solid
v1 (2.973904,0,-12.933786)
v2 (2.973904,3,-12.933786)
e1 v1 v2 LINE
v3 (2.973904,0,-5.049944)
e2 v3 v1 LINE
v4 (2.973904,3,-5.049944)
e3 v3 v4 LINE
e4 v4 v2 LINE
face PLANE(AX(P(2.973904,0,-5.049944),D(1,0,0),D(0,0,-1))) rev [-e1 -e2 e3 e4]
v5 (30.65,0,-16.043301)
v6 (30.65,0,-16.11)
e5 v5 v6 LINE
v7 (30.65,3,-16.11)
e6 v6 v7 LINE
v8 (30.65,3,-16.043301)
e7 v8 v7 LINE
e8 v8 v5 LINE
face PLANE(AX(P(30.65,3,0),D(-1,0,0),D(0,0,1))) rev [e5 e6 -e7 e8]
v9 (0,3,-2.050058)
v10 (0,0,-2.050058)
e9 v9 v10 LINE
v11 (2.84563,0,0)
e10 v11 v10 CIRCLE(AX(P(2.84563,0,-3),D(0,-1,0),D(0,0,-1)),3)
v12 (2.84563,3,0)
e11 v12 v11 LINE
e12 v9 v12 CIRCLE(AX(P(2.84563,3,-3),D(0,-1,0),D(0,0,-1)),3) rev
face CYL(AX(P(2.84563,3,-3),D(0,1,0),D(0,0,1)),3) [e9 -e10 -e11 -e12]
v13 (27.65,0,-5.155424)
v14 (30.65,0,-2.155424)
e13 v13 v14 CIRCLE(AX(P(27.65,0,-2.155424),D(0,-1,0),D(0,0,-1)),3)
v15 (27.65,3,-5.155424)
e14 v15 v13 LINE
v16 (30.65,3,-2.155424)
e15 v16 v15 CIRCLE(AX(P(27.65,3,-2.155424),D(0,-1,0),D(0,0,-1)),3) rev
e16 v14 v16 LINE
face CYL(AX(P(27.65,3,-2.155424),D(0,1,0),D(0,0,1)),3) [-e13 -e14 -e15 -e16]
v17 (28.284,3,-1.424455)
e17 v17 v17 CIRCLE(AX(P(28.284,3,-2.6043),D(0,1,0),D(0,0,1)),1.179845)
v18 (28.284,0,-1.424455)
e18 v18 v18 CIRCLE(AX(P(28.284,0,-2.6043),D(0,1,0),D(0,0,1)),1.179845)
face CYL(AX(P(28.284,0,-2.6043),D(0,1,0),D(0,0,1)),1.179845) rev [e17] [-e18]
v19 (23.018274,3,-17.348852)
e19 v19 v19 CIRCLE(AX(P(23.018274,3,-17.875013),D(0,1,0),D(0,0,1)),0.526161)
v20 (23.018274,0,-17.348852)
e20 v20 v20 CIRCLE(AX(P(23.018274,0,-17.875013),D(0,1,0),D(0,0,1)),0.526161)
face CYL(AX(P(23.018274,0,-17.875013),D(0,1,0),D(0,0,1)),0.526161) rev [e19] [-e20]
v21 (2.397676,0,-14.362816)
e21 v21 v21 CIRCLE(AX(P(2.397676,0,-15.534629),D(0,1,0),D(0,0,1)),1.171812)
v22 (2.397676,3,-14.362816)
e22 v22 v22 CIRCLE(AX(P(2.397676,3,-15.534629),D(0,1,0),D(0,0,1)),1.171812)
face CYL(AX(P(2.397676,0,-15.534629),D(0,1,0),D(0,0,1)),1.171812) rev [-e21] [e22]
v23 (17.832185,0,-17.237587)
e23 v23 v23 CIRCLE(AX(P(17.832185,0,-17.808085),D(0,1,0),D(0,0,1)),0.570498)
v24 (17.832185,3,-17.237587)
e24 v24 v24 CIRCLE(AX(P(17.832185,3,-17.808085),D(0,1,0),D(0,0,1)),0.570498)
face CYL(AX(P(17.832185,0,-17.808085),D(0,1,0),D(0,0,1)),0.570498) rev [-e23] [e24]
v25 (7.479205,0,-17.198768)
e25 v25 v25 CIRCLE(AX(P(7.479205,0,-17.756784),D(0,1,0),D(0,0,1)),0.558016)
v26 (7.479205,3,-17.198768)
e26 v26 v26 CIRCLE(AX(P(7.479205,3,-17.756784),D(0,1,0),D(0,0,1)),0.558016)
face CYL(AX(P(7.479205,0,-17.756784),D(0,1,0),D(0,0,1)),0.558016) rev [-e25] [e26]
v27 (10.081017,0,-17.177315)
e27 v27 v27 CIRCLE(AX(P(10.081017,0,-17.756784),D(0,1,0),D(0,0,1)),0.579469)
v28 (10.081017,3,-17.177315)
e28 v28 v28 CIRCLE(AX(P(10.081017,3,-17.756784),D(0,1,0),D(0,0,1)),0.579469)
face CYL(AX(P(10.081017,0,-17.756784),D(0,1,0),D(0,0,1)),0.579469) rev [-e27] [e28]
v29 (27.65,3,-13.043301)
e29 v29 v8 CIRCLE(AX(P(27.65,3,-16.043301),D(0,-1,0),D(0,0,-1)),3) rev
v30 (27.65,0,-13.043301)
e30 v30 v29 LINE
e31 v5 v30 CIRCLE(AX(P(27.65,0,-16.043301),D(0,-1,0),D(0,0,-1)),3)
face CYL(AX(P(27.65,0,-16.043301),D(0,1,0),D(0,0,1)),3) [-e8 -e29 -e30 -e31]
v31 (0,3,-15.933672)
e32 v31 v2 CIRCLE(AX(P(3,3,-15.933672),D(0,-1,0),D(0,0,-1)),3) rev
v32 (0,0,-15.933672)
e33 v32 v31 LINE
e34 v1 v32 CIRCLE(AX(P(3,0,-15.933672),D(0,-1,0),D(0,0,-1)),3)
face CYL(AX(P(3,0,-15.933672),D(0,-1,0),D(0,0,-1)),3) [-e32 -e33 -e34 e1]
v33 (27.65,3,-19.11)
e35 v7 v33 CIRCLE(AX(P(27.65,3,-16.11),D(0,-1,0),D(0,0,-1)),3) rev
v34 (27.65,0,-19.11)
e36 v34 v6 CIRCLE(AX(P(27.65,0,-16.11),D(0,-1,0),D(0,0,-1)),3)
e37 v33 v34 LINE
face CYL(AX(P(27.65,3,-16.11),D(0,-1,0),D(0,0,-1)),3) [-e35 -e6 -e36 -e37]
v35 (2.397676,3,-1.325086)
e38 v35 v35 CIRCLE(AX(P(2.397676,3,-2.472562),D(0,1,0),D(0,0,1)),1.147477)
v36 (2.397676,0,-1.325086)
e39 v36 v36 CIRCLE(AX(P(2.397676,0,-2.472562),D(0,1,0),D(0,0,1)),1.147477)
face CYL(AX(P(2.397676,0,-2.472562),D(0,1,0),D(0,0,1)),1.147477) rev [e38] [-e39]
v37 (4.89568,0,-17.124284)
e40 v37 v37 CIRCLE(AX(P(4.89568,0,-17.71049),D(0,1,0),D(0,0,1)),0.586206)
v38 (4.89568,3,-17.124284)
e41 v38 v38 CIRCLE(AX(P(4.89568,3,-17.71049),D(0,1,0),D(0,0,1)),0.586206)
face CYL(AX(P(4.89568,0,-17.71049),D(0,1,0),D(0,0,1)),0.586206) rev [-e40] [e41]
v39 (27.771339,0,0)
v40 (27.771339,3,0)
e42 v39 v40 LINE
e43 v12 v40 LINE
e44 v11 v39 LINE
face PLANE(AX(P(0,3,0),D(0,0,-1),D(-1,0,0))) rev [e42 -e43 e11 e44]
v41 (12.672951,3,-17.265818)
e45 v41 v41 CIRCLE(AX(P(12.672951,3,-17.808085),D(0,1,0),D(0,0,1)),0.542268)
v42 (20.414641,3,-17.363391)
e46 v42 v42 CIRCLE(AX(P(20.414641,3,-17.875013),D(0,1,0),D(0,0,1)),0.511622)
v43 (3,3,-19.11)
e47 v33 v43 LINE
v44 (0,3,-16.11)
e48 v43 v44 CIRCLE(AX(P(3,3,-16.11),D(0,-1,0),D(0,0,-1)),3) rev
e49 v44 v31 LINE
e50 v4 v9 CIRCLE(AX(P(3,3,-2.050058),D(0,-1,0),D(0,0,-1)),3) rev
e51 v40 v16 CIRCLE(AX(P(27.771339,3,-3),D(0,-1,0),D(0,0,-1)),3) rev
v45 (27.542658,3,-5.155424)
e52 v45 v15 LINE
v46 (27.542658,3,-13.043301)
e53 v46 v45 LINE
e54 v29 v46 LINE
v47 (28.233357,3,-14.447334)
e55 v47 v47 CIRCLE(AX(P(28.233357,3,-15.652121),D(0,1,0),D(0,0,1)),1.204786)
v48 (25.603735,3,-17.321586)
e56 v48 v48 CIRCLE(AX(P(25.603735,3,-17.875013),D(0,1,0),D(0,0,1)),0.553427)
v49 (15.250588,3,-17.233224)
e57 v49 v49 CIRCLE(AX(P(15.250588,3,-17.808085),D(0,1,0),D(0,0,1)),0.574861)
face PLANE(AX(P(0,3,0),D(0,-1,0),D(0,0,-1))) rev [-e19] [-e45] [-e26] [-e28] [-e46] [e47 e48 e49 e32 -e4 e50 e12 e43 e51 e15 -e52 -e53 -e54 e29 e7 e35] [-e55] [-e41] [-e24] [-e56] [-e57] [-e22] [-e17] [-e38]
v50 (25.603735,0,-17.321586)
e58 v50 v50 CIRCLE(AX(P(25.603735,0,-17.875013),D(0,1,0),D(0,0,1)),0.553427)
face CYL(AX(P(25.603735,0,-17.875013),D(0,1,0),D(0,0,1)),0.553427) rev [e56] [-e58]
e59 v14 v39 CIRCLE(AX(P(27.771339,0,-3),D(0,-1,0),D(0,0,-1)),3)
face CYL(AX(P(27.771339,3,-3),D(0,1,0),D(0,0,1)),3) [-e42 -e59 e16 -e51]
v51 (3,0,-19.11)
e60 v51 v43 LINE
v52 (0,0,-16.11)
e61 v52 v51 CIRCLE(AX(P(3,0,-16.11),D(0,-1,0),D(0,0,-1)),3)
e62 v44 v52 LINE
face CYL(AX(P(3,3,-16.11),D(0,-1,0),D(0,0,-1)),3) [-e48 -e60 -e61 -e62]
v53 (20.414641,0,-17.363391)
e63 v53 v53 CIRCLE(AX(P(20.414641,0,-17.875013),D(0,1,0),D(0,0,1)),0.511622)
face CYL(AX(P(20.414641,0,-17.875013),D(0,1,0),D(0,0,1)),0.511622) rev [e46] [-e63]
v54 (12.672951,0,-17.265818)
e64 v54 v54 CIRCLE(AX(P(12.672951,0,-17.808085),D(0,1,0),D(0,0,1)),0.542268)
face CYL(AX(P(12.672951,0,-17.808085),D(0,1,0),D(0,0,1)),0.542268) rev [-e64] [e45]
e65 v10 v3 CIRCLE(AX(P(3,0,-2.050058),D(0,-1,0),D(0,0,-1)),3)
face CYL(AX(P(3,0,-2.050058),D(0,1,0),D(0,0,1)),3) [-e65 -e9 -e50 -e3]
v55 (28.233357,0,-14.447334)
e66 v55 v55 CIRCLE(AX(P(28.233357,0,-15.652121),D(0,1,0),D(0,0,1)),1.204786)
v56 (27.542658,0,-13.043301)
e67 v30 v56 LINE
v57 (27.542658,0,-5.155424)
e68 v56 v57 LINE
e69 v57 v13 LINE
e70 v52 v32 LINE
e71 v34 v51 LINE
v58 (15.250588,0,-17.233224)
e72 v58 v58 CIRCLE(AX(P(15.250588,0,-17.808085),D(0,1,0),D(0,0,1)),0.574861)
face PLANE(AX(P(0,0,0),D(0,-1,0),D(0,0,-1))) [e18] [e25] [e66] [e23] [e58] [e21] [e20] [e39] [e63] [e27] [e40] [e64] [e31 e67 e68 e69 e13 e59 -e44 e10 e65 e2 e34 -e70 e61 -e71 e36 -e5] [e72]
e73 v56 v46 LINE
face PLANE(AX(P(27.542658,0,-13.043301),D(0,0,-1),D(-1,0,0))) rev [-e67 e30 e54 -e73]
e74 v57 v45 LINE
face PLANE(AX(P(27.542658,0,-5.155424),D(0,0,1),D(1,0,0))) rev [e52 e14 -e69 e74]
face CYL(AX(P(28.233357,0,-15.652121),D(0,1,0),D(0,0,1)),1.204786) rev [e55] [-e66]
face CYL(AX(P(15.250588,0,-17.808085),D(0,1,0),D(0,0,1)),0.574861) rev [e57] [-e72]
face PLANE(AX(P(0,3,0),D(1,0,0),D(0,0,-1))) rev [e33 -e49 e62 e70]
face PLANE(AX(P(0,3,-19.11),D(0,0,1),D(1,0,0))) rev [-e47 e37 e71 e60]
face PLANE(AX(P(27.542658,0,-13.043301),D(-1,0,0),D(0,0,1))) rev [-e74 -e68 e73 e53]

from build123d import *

# Parameters (mm, degrees)
SKETCH1_W           = 30.65
SKETCH1_H           = 19.11
BOSS_EXTRUDE1_DEPTH = 3
SKETCH4_W           = 3.107341839
SKETCH4_H           = 7.887877928
CUT_EXTRUDE1_DEPTH  = 37.243821542
FILLET5_R           = 3
SKETCH5_W           = 2.973903927
SKETCH5_H           = 7.883841559
CUT_EXTRUDE2_DEPTH  = 37.243821542
FILLET6_R           = 3
FILLET7_R           = 3
SKETCH6_R           = 1.147476531
SKETCH6_R_2         = 1.171812298
SKETCH6_R_3         = 1.204786214
SKETCH6_R_4         = 1.179845326
CUT_EXTRUDE3_DEPTH  = 37.243821542
SKETCH7_R           = 0.553427196
SKETCH7_R_2         = 0.52616078
SKETCH7_R_3         = 0.51162232
SKETCH7_R_4         = 0.570497963
SKETCH7_R_5         = 0.574861319
SKETCH7_R_6         = 0.542267602
SKETCH7_R_7         = 0.579469216
SKETCH7_R_8         = 0.558015666
SKETCH7_R_9         = 0.586205708
CUT_EXTRUDE4_DEPTH  = 37.243821542


with BuildPart() as part:
    # Sketch1 → Boss-Extrude1 (new body)
    with BuildSketch(Plane(origin=(0, 0, 0), x_dir=(1, 0, 0), z_dir=(0, 1, 0))):
        with Locations((15.325, 9.555)):
            Rectangle(SKETCH1_W, SKETCH1_H)
    extrude(amount=BOSS_EXTRUDE1_DEPTH)

    # Sketch4 → Cut-Extrude1 (cut, through all)
    with BuildSketch(Plane(origin=(0, 3, 0), x_dir=(1, 0, 0), z_dir=(0, 1, 0))):
        with Locations((29.096329081, 9.099362482)):
            Rectangle(SKETCH4_W, SKETCH4_H)
    extrude(amount=-CUT_EXTRUDE1_DEPTH, mode=Mode.SUBTRACT)

    # Fillet5
    fillet5_edges = [part.edges().sort_by_distance(p)[0] for p in [
        (30.65, 1.5, -13.043301446),
        (30.65, 1.5, -5.155423518),
    ]]
    fillet(fillet5_edges, radius=FILLET5_R)

    # Sketch5 → Cut-Extrude2 (cut, through all)
    with BuildSketch(Plane(origin=(0, 3, 0), x_dir=(1, 0, 0), z_dir=(0, 1, 0))):
        with Locations((1.486951964, 8.991865097)):
            Rectangle(SKETCH5_W, SKETCH5_H)
    extrude(amount=-CUT_EXTRUDE2_DEPTH, mode=Mode.SUBTRACT)

    # Fillet6
    # the kernel refuses this fillet: 3 mm, written as the material it takes off along each edge
    with BuildSketch(Plane(origin=(0, 10.5, -12.933785877), x_dir=(1, 0, 0), z_dir=(0, -1, 0))) as fillet6_piece_1_section:
        with BuildLine():
            CenterArc((FILLET6_R, -FILLET6_R), FILLET6_R, 90, 90)
            Line((0, -FILLET6_R), (0, 0))
            Line((0, 0), (FILLET6_R, 0))
        make_face()
    fillet6_piece_1 = extrude(amount=18, mode=Mode.PRIVATE)
    fillet6_piece_1 = split(fillet6_piece_1, bisect_by=Plane(origin=(2.973903927, 10.5, -12.933785877), z_dir=(-1, 0, 0)), keep=Keep.TOP, mode=Mode.PRIVATE)
    add(fillet6_piece_1, mode=Mode.SUBTRACT)
    with BuildSketch(Plane(origin=(0, 10.5, -5.049944318), x_dir=(0, 0, 1), z_dir=(0, -1, 0))) as fillet6_piece_2_section:
        with BuildLine():
            CenterArc((FILLET6_R, -FILLET6_R), FILLET6_R, 90, 90)
            Line((0, -FILLET6_R), (0, 0))
            Line((0, 0), (FILLET6_R, 0))
        make_face()
    fillet6_piece_2 = extrude(amount=18, mode=Mode.PRIVATE)
    fillet6_piece_2 = split(fillet6_piece_2, bisect_by=Plane(origin=(2.973903927, 10.5, -5.049944318), z_dir=(-1, 0, 0)), keep=Keep.TOP, mode=Mode.PRIVATE)
    add(fillet6_piece_2, mode=Mode.SUBTRACT)

    # Fillet7
    # the kernel refuses this fillet: 3 mm, written as the material it takes off along each edge
    with BuildSketch(Plane(origin=(0, -7.5, -19.11), x_dir=(0, 0, 1), z_dir=(0, 1, 0)), Plane(origin=(30.65, -7.5, -19.11), x_dir=(-1, 0, 0), z_dir=(0, 1, 0))) as fillet7_piece_1:
        with BuildLine():
            CenterArc((FILLET7_R, FILLET7_R), FILLET7_R, 180, 90)
            Line((0, FILLET7_R), (-FILLET7_R * 0.02, FILLET7_R))
            Line((-FILLET7_R * 0.02, FILLET7_R), (-FILLET7_R * 0.02, -FILLET7_R * 0.02))
            Line((-FILLET7_R * 0.02, -FILLET7_R * 0.02), (FILLET7_R, -FILLET7_R * 0.02))
            Line((FILLET7_R, -FILLET7_R * 0.02), (FILLET7_R, 0))
        make_face()
    extrude(amount=18, mode=Mode.SUBTRACT)
    with BuildSketch(Plane(origin=(30.65, -7.196653113, 0), x_dir=(0, 0, -1), z_dir=(0, 1, 0))) as fillet7_piece_2:
        with BuildLine():
            CenterArc((3, 2.878661245), FILLET7_R, 180, 73.64872792)
            Line((0, 2.878661245), (-0.06, 2.878661245))
            Line((-0.06, 2.878661245), (-0.06, 0))
            Line((-0.06, 0), (0, -0.06))
            ThreePointArc((0, -0.06), (1.077711759, -0.06), (2.138531988, -0.057573225))
            Line((2.138531988, -0.057573225), (2.155423518, 0))
        make_face()
    extrude(amount=17.393306227, mode=Mode.SUBTRACT)
    with BuildSketch(Plane(origin=(0, -7.113980163, 0), x_dir=(0, 0, -1), z_dir=(0, 1, 0))) as fillet7_piece_3:
        with BuildLine():
            CenterArc((3, -2.845592065), FILLET7_R, 108.462579453, 71.537420547)
            Line((0, -2.845592065), (-0.06, -2.845592065))
            Line((-0.06, -2.845592065), (-0.06, 0))
            Line((-0.06, 0), (0, 0.06))
            ThreePointArc((0, 0.06), (1.024972159, 0.06), (2.030943204, 0.056911841))
            Line((2.030943204, 0.056911841), (2.049944318, 0))
        make_face()
    extrude(amount=17.227960325, mode=Mode.SUBTRACT)

    # Sketch6 → Cut-Extrude3 (cut, through all)
    with BuildSketch(Plane(origin=(0, 3, 0), x_dir=(1, 0, 0), z_dir=(0, 1, 0))):
        with Locations(Location((2.397675936, 2.472562033, 0), (0, 0, 270))):
            Circle(SKETCH6_R)
        with Locations(Location((2.397675936, 15.534628547, 0), (0, 0, 270))):
            Circle(SKETCH6_R_2)
        with Locations(Location((28.233356839, 15.652120685, 0), (0, 0, 270))):
            Circle(SKETCH6_R_3)
        with Locations(Location((28.283999857, 2.604300321, 0), (0, 0, 270))):
            Circle(SKETCH6_R_4)
    extrude(amount=-CUT_EXTRUDE3_DEPTH, mode=Mode.SUBTRACT)

    # Sketch7 → Cut-Extrude4 (cut, through all)
    with BuildSketch(Plane(origin=(0, 3, 0), x_dir=(1, 0, 0), z_dir=(0, 1, 0))):
        with Locations(Location((25.603735312, 17.875013179, 0), (0, 0, 270))):
            Circle(SKETCH7_R)
        with Locations(Location((23.018273663, 17.875013179, 0), (0, 0, 270))):
            Circle(SKETCH7_R_2)
        with Locations(Location((20.414641054, 17.875013179, 0), (0, 0, 270))):
            Circle(SKETCH7_R_3)
        with Locations(Location((17.832185275, 17.808085307, 0), (0, 0, 270))):
            Circle(SKETCH7_R_4)
        with Locations(Location((15.250588263, 17.808085307, 0), (0, 0, 270))):
            Circle(SKETCH7_R_5)
        with Locations(Location((12.672951441, 17.808085307, 0), (0, 0, 270))):
            Circle(SKETCH7_R_6)
        with Locations(Location((10.081016635, 17.756783748, 0), (0, 0, 270))):
            Circle(SKETCH7_R_7)
        with Locations(Location((7.479204756, 17.756783748, 0), (0, 0, 270))):
            Circle(SKETCH7_R_8)
        with Locations(Location((4.895679995, 17.710489857, 0), (0, 0, 270))):
            Circle(SKETCH7_R_9)
    extrude(amount=-CUT_EXTRUDE4_DEPTH, mode=Mode.SUBTRACT)


solid = part.part
